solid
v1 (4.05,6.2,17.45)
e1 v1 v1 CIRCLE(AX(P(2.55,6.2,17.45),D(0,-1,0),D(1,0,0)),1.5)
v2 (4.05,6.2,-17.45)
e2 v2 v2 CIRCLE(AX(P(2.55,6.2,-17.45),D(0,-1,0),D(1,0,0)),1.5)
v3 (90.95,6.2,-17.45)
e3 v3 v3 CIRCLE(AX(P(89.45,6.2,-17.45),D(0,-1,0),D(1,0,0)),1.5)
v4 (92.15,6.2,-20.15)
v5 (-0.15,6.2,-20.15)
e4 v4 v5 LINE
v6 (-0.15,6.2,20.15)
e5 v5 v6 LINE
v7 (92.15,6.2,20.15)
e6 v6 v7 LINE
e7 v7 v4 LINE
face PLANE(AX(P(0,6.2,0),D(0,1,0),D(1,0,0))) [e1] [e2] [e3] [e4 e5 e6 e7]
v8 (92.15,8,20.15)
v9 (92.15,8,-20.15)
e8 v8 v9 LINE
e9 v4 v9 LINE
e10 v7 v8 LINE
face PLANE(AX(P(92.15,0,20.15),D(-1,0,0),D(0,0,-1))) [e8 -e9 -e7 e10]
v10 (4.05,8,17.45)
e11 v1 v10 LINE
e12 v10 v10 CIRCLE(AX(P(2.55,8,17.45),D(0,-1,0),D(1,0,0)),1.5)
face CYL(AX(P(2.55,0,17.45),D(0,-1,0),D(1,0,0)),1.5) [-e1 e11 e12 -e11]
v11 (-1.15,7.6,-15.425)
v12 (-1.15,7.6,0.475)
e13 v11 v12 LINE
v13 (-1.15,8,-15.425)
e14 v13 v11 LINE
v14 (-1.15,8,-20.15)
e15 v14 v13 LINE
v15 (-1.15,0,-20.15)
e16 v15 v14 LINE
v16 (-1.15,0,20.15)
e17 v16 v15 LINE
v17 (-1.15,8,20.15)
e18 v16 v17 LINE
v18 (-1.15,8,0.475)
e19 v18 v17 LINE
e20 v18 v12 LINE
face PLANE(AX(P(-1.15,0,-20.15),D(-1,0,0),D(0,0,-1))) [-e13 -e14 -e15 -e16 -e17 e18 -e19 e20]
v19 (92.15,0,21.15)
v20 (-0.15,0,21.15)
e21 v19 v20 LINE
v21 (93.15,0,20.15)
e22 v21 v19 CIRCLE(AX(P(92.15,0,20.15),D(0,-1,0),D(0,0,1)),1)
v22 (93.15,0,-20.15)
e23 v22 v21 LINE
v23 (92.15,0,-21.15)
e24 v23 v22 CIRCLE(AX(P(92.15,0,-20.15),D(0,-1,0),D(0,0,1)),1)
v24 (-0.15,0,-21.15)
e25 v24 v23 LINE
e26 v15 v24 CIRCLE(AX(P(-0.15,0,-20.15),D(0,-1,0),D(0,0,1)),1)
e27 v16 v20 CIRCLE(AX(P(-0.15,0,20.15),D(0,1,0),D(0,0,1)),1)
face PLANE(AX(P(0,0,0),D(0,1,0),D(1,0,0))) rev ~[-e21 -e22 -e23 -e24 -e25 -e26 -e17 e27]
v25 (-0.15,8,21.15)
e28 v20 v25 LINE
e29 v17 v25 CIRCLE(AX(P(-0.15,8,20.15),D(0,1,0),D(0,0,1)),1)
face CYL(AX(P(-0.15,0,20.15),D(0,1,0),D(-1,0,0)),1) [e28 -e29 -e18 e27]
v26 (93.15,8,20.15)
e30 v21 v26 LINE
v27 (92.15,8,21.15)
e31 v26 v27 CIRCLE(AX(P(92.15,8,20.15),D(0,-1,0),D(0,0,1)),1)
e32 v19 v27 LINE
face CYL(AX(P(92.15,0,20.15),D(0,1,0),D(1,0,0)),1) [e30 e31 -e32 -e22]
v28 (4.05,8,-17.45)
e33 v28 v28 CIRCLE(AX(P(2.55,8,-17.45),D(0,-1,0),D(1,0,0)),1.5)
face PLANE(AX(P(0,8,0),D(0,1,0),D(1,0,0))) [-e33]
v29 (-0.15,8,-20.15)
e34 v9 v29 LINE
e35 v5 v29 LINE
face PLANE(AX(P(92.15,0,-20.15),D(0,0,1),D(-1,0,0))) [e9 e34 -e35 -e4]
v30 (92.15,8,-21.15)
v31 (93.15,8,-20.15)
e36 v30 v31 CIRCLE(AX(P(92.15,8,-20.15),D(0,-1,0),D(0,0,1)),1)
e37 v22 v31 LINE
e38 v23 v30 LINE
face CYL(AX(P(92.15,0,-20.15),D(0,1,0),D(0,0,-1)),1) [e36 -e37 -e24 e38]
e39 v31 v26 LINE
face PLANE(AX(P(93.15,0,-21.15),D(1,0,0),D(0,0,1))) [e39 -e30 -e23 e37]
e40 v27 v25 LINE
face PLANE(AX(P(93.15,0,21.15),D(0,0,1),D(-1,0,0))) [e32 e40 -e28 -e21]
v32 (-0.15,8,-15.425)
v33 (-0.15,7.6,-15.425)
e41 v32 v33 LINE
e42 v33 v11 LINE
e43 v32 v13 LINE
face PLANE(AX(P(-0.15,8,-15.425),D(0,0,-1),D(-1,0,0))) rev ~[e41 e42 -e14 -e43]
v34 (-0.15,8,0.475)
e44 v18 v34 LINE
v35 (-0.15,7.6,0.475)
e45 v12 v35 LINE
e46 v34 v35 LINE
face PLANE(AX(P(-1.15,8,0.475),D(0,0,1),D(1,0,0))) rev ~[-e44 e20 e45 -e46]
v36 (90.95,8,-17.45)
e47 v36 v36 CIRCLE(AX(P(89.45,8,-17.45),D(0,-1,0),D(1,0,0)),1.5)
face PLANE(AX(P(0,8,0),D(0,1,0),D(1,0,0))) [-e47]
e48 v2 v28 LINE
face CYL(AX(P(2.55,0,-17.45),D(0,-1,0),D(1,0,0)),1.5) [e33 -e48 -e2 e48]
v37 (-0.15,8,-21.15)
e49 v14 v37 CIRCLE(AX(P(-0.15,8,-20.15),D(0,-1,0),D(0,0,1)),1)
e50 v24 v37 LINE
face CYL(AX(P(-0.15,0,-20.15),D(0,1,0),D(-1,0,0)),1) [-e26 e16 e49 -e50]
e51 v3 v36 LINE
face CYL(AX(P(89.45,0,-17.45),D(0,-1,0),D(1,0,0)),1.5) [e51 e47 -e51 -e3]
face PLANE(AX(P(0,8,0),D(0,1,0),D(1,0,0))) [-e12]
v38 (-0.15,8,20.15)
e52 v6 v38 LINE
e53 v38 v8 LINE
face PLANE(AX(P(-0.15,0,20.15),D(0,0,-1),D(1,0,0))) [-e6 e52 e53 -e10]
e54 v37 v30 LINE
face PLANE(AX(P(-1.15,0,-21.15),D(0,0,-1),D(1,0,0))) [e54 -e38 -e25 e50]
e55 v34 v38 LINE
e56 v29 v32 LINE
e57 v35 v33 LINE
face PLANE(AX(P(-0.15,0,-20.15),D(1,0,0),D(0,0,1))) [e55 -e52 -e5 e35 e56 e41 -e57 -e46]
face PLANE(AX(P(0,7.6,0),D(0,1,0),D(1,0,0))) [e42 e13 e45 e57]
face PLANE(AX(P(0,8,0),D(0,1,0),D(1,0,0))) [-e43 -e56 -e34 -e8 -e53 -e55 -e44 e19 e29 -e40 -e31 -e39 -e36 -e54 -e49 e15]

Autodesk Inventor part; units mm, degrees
ref_plane "YZ Plane" through (0, 0, 0) normal (1, 0, 0) x (0, 1, 0)
ref_plane "XZ Plane" through (0, 0, 0) normal (0, 1, 0) x (-1, 0, 0)
ref_plane "XY Plane" through (0, 0, 0) normal (0, 0, 1) x (1, 0, 0)
sketch "Sketch1" plane through (0, 0, 0) normal (0, 1, 0) x (-1, 0, 0)
  line L0 (0, 20) -> (-92, 20)
  line L1 (-92, 20) -> (-92, -20)
  line L2 (-92, -20) -> (0, -20)
  line L3 (0, -20) -> (0, 20)
  line L4 (-46, 20) -> (-46, -20) construction
  line L5 (0, 0) -> (-92, 0) construction
  line L6 (0.15, 20.15) -> (-92.15, 20.15)
  line L7 (-92.15, 20.15) -> (-92.15, -20.15)
  line L8 (-92.15, -20.15) -> (0.15, -20.15)
  line L9 (0.15, -20.15) -> (0.15, 20.15)
  dimension "d0" = 40
  dimension "d1" = 92
  dimension "d19" = 0.15
extrude "Extrusion1" add sketch "Sketch1" along normal blind 0.7 contours L3 L2 L1 L0 | L9 L8 L7 L6
sketch "Sketch2" plane through (0, 0.7, 0) normal (0, 1, 0) x (1, 0, 0)
  line L0 (92.15, -20.15) -> (92.15, 20.15) projected
  line L1 (92.15, 20.15) -> (-0.15, 20.15) projected
  line L2 (-0.15, 20.15) -> (-0.15, -20.15) projected
  line L3 (-0.15, -20.15) -> (92.15, -20.15) projected
  line L4 (1.05, -18.95) -> (1.05, 18.95)
  line L5 (1.05, 18.95) -> (90.95, 18.95)
  line L6 (90.95, 18.95) -> (90.95, -18.95)
  line L7 (90.95, -18.95) -> (1.05, -18.95)
  dimension "d20" = 1.2
extrude "Extrusion2" add sketch "Sketch2" along normal blind 5.5
sketch "Sketch4" plane through (0, 0, 0) normal (0, 1, 0) x (1, 0, 0)
  line L0 (1.05, -18.95) -> (90.95, -18.95) projected
  line L1 (90.95, -18.95) -> (90.95, 18.95) projected
  line L2 (90.95, 18.95) -> (1.05, 18.95) projected
  line L3 (1.05, 18.95) -> (1.05, -18.95) projected
  line L4 (92.15, 20.15) -> (-0.15, 20.15) projected
  line L5 (-0.15, 20.15) -> (-0.15, -20.15) projected
  line L6 (-0.15, -20.15) -> (92.15, -20.15) projected
  line L7 (92.15, -20.15) -> (92.15, 20.15) projected
  line L8 (1.05, -18.95) -> (1.05, 18.95) projected
  line L9 (1.05, 18.95) -> (90.95, 18.95) projected
  line L10 (90.95, 18.95) -> (90.95, -18.95) projected
  line L11 (90.95, -18.95) -> (1.05, -18.95) projected
  circle A0 centre (2.55, -17.45) radius 1.5
  circle A1 centre (2.55, 17.45) radius 1.5
  circle A2 centre (89.45, 17.45) radius 1.5
  line L12 (-1.15, -21.15) -> (-1.15, 21.15)
  line L13 (-1.15, 21.15) -> (93.15, 21.15)
  line L14 (93.15, 21.15) -> (93.15, -21.15)
  line L15 (93.15, -21.15) -> (-1.15, -21.15)
  line L16 (-0.15, 20.15) -> (-1.15, 20.15)
  line L17 (-0.15, -20.15) -> (-1.15, -20.15)
  line L18 (2.55, -17.45) -> (1.05, -17.45)
  line L19 (2.55, -17.45) -> (2.55, -18.95)
  line L20 (2.55, 17.45) -> (2.55, 18.95)
  line L21 (2.55, 17.45) -> (1.05, 17.45)
  line L22 (89.45, 17.45) -> (89.45, 18.95)
  line L23 (89.45, 17.45) -> (90.95, 17.45)
  circle A3 centre (2.55, -17.55) radius 1.6 projected
  point P0 (0, 0)
  dimension "d21" = 3
  dimension "d22" = 3
  dimension "d24" = 3
  dimension "d25" = 2.7
  dimension "d26" = 2.7
  dimension "d28" = 2.7
  dimension "d29" = 1
extrude "Extrusion3" add sketch "Sketch4" along normal blind 8 contours L19 L18 A0 | A0 L18 L19 | L21 L20 A1 | A1 L20 L21 | L23 L22 A2 | A2 L22 L23 | L4 L16 L12 L13 L14 L15 L17 L6 L7 | L5 L17 L12 L16
sketch "Sketch7" plane through (0, 8, 0) normal (0, 1, 0) x (1, 0, 0)
  line L0 (0.05, 14.425) -> (6.05, 14.425) projected
  line L1 (0.05, 0.525) -> (6.05, 0.525) projected
  line L2 (-1.15, 21.15) -> (-1.15, -21.15) projected
  line L3 (-1.15, -21.15) -> (93.15, -21.15) projected
  line L4 (93.15, -21.15) -> (93.15, 21.15) projected
  line L5 (93.15, 21.15) -> (-1.15, 21.15) projected
  line L6 (-0.15, 20.15) -> (92.15, 20.15) projected
  line L7 (92.15, 20.15) -> (92.15, -20.15) projected
  line L8 (92.15, -20.15) -> (-0.15, -20.15) projected
  line L9 (-0.15, -20.15) -> (-0.15, 20.15) projected
  line L10 (-0.15, 20.15) -> (-0.15, -20.15) projected
  line L11 (-1.15, 21.15) -> (-1.15, -21.15) projected
  line L12 (-0.15, 15.425) -> (-1.15, 15.425)
  line L13 (-1.15, 15.425) -> (-1.15, -0.475)
  line L14 (-1.15, -0.475) -> (-0.15, -0.475)
  line L15 (-0.15, -0.475) -> (-0.15, 15.425)
  point P0 (0, 0)
  point P1 (-0.15, -0.475)
  point P2 (-1.15, 15.425)
  dimension "d32" = 1
  dimension "d33" = 1
extrude "Extrusion4" cut sketch "Sketch7" against normal blind 0.4 contours L12 L9 L14 L2
sketch "Sketch8" plane through (0, 0.7, 0) normal (0, 1, 0) x (1, 0, 0)
  circle A0 centre (55.0598, -12.05) radius 4.4577 projected
  circle A1 centre (60.1398, -17.13) radius 0.9906 projected
  circle A2 centre (49.9798, -6.97) radius 0.9906 projected
  circle A3 centre (49.9798, -6.97) radius 0.8406
  circle A4 centre (60.1398, -17.13) radius 0.8406
  point P0 (0, 0)
  dimension "d37" = 0.15
  dimension "d38" = 0.15
extrude "Extrusion5" [suppressed]
sketch "Sketch9" plane through (0, 0.7, 0) normal (0, 1, 0) x (1, 0, 0)
  arc A0 (1.05, 17.45) -> (2.55, 18.95) centre (2.55, 17.45) ccw projected
  arc A1 (89.45, 18.95) -> (90.95, 17.45) centre (89.45, 17.45) ccw projected
  arc A2 (1.05, -17.45) -> (2.55, -18.95) centre (2.55, -17.45) ccw projected
  line L0 (90.95, 18.95) -> (89.45, 18.95) projected
  line L1 (1.05, 18.95) -> (1.05, 17.45) projected
  circle A3 centre (2.55, 17.45) radius 1.5 projected
  circle A4 centre (2.55, -17.45) radius 1.5 projected
  circle A5 centre (89.45, -17.45) radius 1.5 projected
  circle A6 centre (89.45, 17.45) radius 1.5 projected
  line L2 (2.55, 17.45) -> (1.05, 17.45)
  line L3 (2.55, 17.45) -> (2.55, 18.95)
  line L4 (89.45, 17.45) -> (89.45, 18.95)
  line L5 (89.45, 17.45) -> (90.95, 17.45)
  line L6 (89.45, -17.45) -> (89.45, -18.95)
  line L7 (89.45, -17.45) -> (90.95, -17.45)
  line L8 (2.55, -17.45) -> (1.05, -17.45)
  line L9 (2.55, -17.45) -> (2.55, -18.95)
  line L10 (1.05, 17.45) -> (1.05, -17.45) projected
  arc A7 (2.55, -18.95) -> (1.05, -17.45) centre (2.55, -17.45) ccw projected
  line L11 (2.55, -18.95) -> (90.95, -18.95) projected
  line L12 (90.95, -18.95) -> (90.95, 17.45) projected
  line L13 (89.45, 18.95) -> (2.55, 18.95) projected
  arc A8 (2.55, 18.95) -> (1.05, 17.45) centre (2.55, 17.45) ccw projected
  line L14 (2.55, 18.95) -> (1.05, 18.95) projected
  arc A9 (90.95, 17.45) -> (89.45, 18.95) centre (89.45, 17.45) ccw projected
  line L15 (90.95, 17.45) -> (90.95, 18.95) projected
  line L16 (1.05, -17.45) -> (1.05, -18.95) projected
  line L17 (1.05, -18.95) -> (2.55, -18.95) projected
  point P0 (0, 0)
  point P1 (90.95, 17.45)
  point P2 (89.45, 18.95)
  point P3 (2.55, 18.95)
  point P4 (1.05, 17.45)
  point P5 (2.55, -18.95)
  point P6 (1.05, -17.45)
extrude "Extrusion6" add sketch "Sketch9" along normal up to surface (5.5 mm away) contours L1 L14 A3 | A0 L13 A1 L12 A5 L11 A4 L10 | L8 L9 A2 | A4 L9 L8 | A2 L17 L16 | L0 L15 A6 | L6 L7 A5 | A5 L7 L6 | A5 L12 L11
fillet "Fillet1" radius 1 4 edges at (-1.15, 4, 21.15) (93.15, 4, 21.15) (93.15, 4, -21.15) (-1.15, 4, -21.15)
equation "\"d22\" = d21"
equation "\"d24\" = d21"
equation "\"d26\" = d25"
equation "\"d28\" = d25"
equation "\"d33\" = d32"
properties part number "base"
